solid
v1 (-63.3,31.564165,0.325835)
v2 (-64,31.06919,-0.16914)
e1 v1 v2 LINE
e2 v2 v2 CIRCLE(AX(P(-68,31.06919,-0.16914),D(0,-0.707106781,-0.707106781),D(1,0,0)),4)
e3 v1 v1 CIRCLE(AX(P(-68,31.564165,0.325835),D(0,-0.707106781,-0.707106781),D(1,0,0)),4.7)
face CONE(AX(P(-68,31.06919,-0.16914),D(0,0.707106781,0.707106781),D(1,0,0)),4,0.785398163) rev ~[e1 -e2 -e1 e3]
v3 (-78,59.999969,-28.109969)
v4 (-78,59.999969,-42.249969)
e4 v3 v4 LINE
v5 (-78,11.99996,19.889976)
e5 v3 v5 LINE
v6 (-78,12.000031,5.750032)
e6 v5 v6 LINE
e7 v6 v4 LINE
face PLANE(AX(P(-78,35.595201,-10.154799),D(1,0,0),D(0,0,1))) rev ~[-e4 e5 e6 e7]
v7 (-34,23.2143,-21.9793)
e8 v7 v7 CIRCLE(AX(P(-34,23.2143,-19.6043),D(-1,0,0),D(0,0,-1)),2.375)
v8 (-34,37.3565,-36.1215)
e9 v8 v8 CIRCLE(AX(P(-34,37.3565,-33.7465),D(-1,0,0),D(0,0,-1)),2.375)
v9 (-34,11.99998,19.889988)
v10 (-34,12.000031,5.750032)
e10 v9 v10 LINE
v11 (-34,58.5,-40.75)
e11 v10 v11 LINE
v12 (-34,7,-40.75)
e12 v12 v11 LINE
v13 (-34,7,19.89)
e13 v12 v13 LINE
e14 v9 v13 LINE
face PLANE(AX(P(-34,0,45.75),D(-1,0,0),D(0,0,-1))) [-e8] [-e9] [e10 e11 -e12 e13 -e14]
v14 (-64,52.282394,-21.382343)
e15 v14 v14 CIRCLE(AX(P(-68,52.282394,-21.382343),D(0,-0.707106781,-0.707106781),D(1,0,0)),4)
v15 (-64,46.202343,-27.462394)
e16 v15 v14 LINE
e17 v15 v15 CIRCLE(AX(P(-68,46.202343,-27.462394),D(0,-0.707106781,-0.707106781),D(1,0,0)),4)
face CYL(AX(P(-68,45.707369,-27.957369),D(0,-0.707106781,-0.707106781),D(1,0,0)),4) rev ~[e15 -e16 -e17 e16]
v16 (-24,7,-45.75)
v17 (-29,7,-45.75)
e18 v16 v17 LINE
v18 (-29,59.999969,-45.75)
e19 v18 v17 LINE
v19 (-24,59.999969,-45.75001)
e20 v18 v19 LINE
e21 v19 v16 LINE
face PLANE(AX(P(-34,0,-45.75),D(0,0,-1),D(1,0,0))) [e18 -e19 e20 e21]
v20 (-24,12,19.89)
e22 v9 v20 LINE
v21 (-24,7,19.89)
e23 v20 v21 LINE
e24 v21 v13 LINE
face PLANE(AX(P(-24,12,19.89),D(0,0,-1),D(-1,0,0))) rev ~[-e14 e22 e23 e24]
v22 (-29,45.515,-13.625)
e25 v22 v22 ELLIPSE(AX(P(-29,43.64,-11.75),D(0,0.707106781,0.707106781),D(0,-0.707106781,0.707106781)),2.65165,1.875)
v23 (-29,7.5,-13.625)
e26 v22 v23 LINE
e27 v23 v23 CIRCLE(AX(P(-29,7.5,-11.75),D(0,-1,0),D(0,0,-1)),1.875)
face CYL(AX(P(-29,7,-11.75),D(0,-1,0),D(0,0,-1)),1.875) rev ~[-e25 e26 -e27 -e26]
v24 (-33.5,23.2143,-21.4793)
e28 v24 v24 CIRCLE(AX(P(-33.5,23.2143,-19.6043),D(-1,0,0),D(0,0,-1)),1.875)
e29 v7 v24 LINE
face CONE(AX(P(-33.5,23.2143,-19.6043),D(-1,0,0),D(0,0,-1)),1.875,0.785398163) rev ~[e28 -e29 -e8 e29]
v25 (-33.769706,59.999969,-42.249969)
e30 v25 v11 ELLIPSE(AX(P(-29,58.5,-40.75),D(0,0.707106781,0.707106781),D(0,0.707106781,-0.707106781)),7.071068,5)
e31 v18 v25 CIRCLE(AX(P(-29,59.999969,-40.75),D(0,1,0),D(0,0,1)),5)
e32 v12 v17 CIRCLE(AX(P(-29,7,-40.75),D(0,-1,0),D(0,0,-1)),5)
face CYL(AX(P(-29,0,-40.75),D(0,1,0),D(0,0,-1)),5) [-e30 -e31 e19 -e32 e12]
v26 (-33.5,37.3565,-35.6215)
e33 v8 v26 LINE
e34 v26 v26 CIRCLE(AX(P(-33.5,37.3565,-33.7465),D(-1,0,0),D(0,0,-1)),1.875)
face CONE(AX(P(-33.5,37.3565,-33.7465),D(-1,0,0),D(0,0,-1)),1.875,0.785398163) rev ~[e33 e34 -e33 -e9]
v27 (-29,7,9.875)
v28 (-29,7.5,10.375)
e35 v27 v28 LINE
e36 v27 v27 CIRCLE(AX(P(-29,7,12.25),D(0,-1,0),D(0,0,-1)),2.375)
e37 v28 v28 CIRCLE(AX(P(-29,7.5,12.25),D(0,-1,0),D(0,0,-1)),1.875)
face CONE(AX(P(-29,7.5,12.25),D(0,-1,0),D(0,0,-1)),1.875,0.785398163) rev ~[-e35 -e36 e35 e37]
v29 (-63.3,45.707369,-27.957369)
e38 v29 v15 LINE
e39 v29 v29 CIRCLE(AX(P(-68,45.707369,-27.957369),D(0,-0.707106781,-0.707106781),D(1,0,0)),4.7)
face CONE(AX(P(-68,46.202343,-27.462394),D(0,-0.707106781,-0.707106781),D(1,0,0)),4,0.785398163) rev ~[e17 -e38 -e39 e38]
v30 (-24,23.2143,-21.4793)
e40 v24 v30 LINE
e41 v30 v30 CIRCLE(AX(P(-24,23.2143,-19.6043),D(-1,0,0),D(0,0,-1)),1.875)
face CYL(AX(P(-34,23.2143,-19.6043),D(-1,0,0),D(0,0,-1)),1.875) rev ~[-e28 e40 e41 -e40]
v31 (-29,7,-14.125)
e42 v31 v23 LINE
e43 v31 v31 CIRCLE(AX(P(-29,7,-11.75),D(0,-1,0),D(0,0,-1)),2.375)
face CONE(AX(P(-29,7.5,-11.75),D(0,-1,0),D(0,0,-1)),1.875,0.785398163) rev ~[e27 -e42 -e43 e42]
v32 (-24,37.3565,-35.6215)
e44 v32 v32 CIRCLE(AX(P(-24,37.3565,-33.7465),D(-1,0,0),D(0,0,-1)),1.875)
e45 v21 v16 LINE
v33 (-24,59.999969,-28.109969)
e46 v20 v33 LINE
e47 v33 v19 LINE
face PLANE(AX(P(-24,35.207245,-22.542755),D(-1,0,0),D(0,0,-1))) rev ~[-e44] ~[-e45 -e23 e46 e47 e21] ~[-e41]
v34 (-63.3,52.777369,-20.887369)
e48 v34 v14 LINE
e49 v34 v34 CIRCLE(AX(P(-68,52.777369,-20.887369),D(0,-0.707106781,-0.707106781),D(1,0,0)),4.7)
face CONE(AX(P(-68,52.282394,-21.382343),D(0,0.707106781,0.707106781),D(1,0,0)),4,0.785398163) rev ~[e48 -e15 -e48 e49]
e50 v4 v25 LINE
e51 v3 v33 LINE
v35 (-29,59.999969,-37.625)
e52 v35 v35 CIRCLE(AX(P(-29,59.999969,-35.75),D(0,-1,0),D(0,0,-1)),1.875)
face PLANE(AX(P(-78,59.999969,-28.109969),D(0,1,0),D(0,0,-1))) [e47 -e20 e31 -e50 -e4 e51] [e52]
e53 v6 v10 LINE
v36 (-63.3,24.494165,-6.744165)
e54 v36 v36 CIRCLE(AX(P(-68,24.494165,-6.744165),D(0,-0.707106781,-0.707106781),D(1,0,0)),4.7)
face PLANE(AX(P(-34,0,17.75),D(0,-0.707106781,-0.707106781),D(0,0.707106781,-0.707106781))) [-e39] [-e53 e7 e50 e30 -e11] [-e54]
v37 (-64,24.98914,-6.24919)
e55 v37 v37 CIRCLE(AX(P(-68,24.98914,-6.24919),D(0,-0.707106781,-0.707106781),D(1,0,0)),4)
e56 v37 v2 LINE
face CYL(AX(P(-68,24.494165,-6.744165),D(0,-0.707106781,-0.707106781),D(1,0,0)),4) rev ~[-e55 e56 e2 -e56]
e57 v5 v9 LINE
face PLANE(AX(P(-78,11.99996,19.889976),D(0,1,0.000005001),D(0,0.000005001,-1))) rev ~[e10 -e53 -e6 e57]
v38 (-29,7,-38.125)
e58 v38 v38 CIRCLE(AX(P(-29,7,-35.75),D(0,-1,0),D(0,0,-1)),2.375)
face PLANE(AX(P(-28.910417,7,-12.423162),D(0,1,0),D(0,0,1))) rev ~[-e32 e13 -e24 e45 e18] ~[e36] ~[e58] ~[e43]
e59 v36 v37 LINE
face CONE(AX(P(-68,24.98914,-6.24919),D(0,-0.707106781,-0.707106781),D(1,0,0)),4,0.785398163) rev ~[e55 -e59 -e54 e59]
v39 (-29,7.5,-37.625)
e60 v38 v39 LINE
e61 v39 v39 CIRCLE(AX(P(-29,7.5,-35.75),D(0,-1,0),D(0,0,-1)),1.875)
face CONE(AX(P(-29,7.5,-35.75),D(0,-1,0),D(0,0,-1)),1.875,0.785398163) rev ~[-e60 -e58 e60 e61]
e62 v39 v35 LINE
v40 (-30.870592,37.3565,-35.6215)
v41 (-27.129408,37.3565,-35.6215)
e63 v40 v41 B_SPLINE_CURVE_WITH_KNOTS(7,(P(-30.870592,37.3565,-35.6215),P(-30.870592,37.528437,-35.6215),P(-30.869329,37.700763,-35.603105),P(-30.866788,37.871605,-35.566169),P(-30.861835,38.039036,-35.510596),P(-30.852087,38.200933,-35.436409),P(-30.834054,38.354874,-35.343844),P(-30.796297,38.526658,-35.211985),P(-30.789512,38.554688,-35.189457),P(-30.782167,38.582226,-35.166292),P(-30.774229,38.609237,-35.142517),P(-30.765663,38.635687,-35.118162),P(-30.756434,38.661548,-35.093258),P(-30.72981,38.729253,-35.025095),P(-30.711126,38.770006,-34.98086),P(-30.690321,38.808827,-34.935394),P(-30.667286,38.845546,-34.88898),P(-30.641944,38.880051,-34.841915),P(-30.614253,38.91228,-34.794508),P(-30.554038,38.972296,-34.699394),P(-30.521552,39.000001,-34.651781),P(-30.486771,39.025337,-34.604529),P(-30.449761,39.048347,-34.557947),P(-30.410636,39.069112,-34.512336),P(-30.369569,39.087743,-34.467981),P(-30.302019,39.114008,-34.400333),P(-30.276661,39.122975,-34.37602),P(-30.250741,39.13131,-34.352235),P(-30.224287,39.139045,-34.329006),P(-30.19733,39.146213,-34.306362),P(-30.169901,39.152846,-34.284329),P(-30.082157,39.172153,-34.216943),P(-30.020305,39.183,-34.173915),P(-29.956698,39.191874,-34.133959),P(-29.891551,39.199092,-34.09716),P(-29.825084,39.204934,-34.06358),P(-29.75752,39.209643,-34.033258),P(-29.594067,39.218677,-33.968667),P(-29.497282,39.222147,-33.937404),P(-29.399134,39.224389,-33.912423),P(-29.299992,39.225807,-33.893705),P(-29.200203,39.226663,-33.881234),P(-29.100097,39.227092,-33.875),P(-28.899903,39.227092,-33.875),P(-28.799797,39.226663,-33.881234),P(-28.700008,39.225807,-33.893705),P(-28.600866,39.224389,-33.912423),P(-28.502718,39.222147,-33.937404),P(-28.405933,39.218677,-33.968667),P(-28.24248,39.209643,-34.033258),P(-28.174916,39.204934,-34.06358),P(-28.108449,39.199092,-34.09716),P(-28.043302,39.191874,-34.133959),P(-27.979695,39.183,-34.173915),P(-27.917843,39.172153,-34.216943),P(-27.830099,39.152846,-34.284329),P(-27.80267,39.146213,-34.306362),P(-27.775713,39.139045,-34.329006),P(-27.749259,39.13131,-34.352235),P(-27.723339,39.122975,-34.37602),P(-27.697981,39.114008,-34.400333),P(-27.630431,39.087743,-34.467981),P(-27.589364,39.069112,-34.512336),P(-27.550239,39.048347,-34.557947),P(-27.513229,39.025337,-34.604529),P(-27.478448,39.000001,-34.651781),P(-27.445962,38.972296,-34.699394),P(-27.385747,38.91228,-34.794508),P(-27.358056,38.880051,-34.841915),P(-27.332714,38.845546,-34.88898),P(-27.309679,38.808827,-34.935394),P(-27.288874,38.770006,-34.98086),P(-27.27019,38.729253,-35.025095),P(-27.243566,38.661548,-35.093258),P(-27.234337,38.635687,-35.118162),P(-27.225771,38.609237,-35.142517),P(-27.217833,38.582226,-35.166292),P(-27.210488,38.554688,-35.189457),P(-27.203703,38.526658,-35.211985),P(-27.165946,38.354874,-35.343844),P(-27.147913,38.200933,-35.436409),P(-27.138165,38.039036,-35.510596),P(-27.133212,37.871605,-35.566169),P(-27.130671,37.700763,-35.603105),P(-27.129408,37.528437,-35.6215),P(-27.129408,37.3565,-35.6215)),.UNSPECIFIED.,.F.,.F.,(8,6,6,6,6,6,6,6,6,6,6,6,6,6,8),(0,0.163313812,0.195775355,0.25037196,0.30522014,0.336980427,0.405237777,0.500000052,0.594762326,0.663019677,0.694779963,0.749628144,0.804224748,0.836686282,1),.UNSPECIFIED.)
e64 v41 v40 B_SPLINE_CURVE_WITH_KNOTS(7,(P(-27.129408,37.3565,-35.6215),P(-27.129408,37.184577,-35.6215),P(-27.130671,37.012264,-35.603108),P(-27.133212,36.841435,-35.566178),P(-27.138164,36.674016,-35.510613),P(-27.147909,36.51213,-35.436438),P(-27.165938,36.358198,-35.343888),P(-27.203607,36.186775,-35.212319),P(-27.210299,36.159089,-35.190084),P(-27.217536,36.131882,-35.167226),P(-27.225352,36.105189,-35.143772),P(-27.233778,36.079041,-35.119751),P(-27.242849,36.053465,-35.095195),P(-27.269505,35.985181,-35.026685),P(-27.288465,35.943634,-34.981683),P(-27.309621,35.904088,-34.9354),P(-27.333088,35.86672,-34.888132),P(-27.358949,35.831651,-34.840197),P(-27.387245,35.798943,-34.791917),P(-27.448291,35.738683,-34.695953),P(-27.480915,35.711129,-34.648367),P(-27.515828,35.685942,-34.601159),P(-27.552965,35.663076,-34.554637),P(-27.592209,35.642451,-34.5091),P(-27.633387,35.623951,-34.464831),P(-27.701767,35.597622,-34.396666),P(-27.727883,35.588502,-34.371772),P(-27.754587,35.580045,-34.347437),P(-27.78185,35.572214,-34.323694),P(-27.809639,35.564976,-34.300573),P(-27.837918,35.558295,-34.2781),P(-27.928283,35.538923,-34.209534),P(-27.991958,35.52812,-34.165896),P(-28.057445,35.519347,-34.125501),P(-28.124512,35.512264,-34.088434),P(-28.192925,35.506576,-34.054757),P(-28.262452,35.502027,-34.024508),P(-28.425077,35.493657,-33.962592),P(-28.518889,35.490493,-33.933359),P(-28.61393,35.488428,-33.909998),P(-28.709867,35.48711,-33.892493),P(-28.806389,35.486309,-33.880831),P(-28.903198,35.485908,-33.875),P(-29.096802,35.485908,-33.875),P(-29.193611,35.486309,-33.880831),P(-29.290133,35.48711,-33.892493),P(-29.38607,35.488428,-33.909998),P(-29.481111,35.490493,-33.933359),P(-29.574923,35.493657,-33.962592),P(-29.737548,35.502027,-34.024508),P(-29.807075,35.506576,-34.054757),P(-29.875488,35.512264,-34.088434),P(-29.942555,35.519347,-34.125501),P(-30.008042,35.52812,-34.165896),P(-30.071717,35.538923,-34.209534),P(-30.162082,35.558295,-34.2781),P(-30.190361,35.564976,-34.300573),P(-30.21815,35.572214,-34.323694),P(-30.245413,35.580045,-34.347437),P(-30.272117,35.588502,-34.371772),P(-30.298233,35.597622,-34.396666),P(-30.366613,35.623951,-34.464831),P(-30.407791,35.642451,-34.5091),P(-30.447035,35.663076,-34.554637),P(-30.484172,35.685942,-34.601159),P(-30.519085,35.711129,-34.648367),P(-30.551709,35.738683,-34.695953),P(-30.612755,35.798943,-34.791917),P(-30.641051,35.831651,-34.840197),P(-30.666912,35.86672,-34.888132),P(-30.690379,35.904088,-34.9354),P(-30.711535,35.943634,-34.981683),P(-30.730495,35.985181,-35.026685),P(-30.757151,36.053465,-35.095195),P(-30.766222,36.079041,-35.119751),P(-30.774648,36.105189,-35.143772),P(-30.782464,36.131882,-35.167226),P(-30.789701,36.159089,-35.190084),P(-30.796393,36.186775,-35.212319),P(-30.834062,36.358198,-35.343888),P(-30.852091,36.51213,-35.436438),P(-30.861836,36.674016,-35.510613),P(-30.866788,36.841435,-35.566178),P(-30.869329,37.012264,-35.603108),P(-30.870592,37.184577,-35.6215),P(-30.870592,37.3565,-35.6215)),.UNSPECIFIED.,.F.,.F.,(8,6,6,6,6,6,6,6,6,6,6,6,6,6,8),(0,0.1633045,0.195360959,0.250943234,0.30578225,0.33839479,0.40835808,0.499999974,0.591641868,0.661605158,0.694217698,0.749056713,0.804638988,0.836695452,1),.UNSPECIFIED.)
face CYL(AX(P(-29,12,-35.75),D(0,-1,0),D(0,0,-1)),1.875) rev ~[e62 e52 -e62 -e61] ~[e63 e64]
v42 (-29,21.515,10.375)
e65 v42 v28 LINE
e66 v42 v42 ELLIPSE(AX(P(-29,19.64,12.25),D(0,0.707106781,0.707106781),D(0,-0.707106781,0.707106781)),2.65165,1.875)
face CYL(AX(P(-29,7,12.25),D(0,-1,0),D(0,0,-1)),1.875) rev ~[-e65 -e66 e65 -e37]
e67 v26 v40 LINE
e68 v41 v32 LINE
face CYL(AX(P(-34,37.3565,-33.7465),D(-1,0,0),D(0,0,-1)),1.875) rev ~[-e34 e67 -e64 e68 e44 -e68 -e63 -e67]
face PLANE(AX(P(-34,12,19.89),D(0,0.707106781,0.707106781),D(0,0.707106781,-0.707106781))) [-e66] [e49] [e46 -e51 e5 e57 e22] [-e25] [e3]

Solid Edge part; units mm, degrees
sketch "Sketch1" plane through (0, 0, 0) normal (0, -1, 0) x (1, 0, 0)
  line L0 (-34, -45.75) -> (34, -45.75)
  line L1 (34, -45.75) -> (34, 45.75)
  line L2 (34, 45.75) -> (-34, 45.75)
  line L3 (-34, 45.75) -> (-34, -45.75)
  dimension "D1" = 68
  dimension "D2" = 91.5
extrude "Protrusion1" add sketch "Sketch1" against normal blind 12
sketch "Sketch2" plane through (0, 0, 0) normal (0, -1, 0) x (1, 0, 0)
  circle A0 centre (0, -14.75) radius 11.25
  circle A1 centre (-15.5, 0.75) radius 1.7
  circle A2 centre (-15.5, -30.25) radius 1.7
  circle A3 centre (15.5, -30.25) radius 1.7
  circle A4 centre (15.5, 0.75) radius 1.7
  dimension "D1" = 22.5
  dimension "D2" = 3.4
  dimension "D3" = 31
  dimension "D4" = 31
extrude "Cutout1" cut sketch "Sketch2" against normal through all
sketch "Sketch3" plane through (0, 0, 0) normal (0, -1, 0) x (1, 0, 0)
  circle A0 centre (7.7782, 36.0282) radius 1.4
  circle A1 centre (7.7782, 20.4718) radius 1.4
  circle A2 centre (-7.7782, 20.4718) radius 1.4
  circle A3 centre (-7.7782, 36.0282) radius 1.4
  circle A4 centre (0, 28.25) radius 6
  dimension "D1" = 7.7782
extrude "Cutout2" cut sketch "Sketch3" against normal through all
sketch "Sketch4" plane through (-34, 6, 0) normal (-1, 0, 0) x (0, 0, -1)
  line L0 (-19.89, -6) -> (45.75, -71.64)
  line L1 (45.75, -71.64) -> (45.75, -6)
  line L2 (45.75, -6) -> (-19.89, -6)
  dimension "D1" = 25.86
extrude "Extrusionsausprägung_2" add sketch "Sketch4" against normal blind 10
sketch "Sketch5" plane through (-34, 38.82, 0) normal (-1, 0, 0) x (0, 0, -1)
  circle A0 centre (33.7465, 1.4635) radius 1.875
  circle A1 centre (19.6043, 15.6057) radius 1.875
  dimension "D1" = 3.75
  dimension "D2" = 20
  dimension "D3" = 42.14
  dimension "D4" = 32.83
extrude "Extrusionsausschnitt_3" cut sketch "Sketch5" against normal blind 14
sketch "Sketch6" plane through (-34, 38.82, 0) normal (-1, 0, 0) x (0, 0, -1)
  line L0 (45.75, -38.82) -> (-31.89, 38.82)
  line L1 (-31.89, 38.82) -> (-17.75, 38.82)
  line L2 (-17.75, 38.82) -> (45.75, -24.68)
  line L3 (45.75, -24.68) -> (45.75, -38.82)
  dimension "D1" = 14.14
extrude "Extrusionsausprägung_4" add sketch "Sketch6" along normal blind 44
sketch "Sketch7" plane through (-54, 31.75, -14) normal (0, -0.7071068, -0.7071068) x (1, 0, 0)
  circle A0 centre (-14, 10.2613) radius 4
  circle A1 centre (-14, -19.7387) radius 4
  dimension "D1" = 8
  dimension "D2" = 34.64
  dimension "D3" = 30
  dimension "D4" = 10
extrude "Cutout3" cut sketch "Sketch7" against normal up to next
mirror "Mirror1" [suppressed]
sketch "Sketch8" plane through (-78, 38.82, -6.93) normal (-1, 0, 0) x (0, 0.7071068, -0.7071068)
  line L0 (29.953, 0) -> (42.4264, 12.4734)
  dimension "D1" = 60
extrude "Cutout4" cut sketch "Sketch8" against normal through all material side at (-78, 60.05, -36.93)
mirror "Mirror2" [suppressed]
fillet "Verrundung_1" radius 5 2 edges at (34, 6, -45.75) (-34, 30, -45.75)
chamfer "Fase_1" distance 0.5 angle 45 2 edges at (-34, 23.2143, -17.7293) (-34, 37.3565, -31.8715)
chamfer "Fase_2" distance 0.4 angle 45 4 edges at (-17.2, 0, -30.25) (-17.2, 0, 0.75) (13.8, 0, 0.75) (13.8, 0, -30.25)
chamfer "Fase_3" distance 0.4 angle 45 4 edges at (-9.1782, 0, 20.4718) (-9.1782, 0, 36.0282) (6.3782, 0, 36.0282) (6.3782, 0, 20.4718)
chamfer "Fase_4" distance 2.5 angle 45 2 edges at (-11.25, 0, -14.75) (0, 12, -3.5)
chamfer "Fase_5" distance 1.4 angle 45 2 edges at (-6, 0, 28.25) (0, 12, 34.25)
sketch "Sketch9" plane through (-78, 30, -5.18) normal (-1, 0, 0) x (0, 0.7071068, -0.7071068)
  line L0 (-30.4551, -4.9992) -> (-20.4566, 4.9992)
extrude "Extrusionsausschnitt_8" cut sketch "Sketch9" against normal blind 44 material side at (-78, 11.95, 12.82)
sketch "Sketch10" plane through (-78, 36, -11.18) normal (-1, 0, 0) x (0, 0.7071068, -0.7071068)
  line L0 (-57.2262, -23.285) -> (7.4741, 41.4152)
extrude "Cutout5" cut sketch "Sketch10" against normal through all material side at (-78, 11.95, 0)
sketch "Sketch11" plane through (-51, 12, -12.93) normal (0, -1, 0) x (0, 0, -1)
  circle A0 centre (22.82, 22) radius 1.875
  circle A1 centre (-1.18, 22) radius 1.875
  circle A2 centre (-25.18, 22) radius 1.875
  dimension "D1" = 3.75
  dimension "D2" = 24
  dimension "D3" = 24
  dimension "D4" = 10
extrude "Cutout6" cut sketch "Sketch11" against normal through all
sketch "Sketch12" plane through (-51, 12, -12.93) normal (0, -1, 0) x (0, 0, -1)
  line L0 (32.82, 27) -> (32.82, 22)
  line L1 (-32.82, 27) -> (32.82, 27)
  line L2 (-32.82, 27) -> (-32.82, 17)
  line L3 (-32.82, 17) -> (-18.68, 17)
  line L4 (-18.68, 17) -> (27.82, 17)
  arc A0 (27.82, 17) -> (32.82, 22) centre (27.82, 22) ccw
extrude "Extrusionsausprägung_6" add sketch "Sketch12" along normal blind 5
sketch "Sketch13" plane through (-29, 7, -12.93) normal (0, -1, 0) x (0, 0, -1)
  circle A0 centre (22.82, 0) radius 1.875
  circle A1 centre (-1.18, 0) radius 1.875
  circle A2 centre (-25.18, 0) radius 1.875
  dimension "D1" = 3.75
  dimension "D2" = 10
  dimension "D3" = 24
  dimension "D4" = 24
extrude "Cutout7" cut sketch "Sketch13" against normal through all
chamfer "Fase_9" distance 0.5 angle 45 3 edges at (-29, 7, -9.875) (-29, 7, 14.125) (-29, 7, -33.875)
chamfer "Fase_10" distance 0.7 angle 45 4 edges at (-72, 24.4942, -6.7442) (-72, 45.7074, -27.9574) (-68, 55.6058, -23.7158) (-68, 34.3926, -2.5026)
properties material "Nylon, allgemein"
